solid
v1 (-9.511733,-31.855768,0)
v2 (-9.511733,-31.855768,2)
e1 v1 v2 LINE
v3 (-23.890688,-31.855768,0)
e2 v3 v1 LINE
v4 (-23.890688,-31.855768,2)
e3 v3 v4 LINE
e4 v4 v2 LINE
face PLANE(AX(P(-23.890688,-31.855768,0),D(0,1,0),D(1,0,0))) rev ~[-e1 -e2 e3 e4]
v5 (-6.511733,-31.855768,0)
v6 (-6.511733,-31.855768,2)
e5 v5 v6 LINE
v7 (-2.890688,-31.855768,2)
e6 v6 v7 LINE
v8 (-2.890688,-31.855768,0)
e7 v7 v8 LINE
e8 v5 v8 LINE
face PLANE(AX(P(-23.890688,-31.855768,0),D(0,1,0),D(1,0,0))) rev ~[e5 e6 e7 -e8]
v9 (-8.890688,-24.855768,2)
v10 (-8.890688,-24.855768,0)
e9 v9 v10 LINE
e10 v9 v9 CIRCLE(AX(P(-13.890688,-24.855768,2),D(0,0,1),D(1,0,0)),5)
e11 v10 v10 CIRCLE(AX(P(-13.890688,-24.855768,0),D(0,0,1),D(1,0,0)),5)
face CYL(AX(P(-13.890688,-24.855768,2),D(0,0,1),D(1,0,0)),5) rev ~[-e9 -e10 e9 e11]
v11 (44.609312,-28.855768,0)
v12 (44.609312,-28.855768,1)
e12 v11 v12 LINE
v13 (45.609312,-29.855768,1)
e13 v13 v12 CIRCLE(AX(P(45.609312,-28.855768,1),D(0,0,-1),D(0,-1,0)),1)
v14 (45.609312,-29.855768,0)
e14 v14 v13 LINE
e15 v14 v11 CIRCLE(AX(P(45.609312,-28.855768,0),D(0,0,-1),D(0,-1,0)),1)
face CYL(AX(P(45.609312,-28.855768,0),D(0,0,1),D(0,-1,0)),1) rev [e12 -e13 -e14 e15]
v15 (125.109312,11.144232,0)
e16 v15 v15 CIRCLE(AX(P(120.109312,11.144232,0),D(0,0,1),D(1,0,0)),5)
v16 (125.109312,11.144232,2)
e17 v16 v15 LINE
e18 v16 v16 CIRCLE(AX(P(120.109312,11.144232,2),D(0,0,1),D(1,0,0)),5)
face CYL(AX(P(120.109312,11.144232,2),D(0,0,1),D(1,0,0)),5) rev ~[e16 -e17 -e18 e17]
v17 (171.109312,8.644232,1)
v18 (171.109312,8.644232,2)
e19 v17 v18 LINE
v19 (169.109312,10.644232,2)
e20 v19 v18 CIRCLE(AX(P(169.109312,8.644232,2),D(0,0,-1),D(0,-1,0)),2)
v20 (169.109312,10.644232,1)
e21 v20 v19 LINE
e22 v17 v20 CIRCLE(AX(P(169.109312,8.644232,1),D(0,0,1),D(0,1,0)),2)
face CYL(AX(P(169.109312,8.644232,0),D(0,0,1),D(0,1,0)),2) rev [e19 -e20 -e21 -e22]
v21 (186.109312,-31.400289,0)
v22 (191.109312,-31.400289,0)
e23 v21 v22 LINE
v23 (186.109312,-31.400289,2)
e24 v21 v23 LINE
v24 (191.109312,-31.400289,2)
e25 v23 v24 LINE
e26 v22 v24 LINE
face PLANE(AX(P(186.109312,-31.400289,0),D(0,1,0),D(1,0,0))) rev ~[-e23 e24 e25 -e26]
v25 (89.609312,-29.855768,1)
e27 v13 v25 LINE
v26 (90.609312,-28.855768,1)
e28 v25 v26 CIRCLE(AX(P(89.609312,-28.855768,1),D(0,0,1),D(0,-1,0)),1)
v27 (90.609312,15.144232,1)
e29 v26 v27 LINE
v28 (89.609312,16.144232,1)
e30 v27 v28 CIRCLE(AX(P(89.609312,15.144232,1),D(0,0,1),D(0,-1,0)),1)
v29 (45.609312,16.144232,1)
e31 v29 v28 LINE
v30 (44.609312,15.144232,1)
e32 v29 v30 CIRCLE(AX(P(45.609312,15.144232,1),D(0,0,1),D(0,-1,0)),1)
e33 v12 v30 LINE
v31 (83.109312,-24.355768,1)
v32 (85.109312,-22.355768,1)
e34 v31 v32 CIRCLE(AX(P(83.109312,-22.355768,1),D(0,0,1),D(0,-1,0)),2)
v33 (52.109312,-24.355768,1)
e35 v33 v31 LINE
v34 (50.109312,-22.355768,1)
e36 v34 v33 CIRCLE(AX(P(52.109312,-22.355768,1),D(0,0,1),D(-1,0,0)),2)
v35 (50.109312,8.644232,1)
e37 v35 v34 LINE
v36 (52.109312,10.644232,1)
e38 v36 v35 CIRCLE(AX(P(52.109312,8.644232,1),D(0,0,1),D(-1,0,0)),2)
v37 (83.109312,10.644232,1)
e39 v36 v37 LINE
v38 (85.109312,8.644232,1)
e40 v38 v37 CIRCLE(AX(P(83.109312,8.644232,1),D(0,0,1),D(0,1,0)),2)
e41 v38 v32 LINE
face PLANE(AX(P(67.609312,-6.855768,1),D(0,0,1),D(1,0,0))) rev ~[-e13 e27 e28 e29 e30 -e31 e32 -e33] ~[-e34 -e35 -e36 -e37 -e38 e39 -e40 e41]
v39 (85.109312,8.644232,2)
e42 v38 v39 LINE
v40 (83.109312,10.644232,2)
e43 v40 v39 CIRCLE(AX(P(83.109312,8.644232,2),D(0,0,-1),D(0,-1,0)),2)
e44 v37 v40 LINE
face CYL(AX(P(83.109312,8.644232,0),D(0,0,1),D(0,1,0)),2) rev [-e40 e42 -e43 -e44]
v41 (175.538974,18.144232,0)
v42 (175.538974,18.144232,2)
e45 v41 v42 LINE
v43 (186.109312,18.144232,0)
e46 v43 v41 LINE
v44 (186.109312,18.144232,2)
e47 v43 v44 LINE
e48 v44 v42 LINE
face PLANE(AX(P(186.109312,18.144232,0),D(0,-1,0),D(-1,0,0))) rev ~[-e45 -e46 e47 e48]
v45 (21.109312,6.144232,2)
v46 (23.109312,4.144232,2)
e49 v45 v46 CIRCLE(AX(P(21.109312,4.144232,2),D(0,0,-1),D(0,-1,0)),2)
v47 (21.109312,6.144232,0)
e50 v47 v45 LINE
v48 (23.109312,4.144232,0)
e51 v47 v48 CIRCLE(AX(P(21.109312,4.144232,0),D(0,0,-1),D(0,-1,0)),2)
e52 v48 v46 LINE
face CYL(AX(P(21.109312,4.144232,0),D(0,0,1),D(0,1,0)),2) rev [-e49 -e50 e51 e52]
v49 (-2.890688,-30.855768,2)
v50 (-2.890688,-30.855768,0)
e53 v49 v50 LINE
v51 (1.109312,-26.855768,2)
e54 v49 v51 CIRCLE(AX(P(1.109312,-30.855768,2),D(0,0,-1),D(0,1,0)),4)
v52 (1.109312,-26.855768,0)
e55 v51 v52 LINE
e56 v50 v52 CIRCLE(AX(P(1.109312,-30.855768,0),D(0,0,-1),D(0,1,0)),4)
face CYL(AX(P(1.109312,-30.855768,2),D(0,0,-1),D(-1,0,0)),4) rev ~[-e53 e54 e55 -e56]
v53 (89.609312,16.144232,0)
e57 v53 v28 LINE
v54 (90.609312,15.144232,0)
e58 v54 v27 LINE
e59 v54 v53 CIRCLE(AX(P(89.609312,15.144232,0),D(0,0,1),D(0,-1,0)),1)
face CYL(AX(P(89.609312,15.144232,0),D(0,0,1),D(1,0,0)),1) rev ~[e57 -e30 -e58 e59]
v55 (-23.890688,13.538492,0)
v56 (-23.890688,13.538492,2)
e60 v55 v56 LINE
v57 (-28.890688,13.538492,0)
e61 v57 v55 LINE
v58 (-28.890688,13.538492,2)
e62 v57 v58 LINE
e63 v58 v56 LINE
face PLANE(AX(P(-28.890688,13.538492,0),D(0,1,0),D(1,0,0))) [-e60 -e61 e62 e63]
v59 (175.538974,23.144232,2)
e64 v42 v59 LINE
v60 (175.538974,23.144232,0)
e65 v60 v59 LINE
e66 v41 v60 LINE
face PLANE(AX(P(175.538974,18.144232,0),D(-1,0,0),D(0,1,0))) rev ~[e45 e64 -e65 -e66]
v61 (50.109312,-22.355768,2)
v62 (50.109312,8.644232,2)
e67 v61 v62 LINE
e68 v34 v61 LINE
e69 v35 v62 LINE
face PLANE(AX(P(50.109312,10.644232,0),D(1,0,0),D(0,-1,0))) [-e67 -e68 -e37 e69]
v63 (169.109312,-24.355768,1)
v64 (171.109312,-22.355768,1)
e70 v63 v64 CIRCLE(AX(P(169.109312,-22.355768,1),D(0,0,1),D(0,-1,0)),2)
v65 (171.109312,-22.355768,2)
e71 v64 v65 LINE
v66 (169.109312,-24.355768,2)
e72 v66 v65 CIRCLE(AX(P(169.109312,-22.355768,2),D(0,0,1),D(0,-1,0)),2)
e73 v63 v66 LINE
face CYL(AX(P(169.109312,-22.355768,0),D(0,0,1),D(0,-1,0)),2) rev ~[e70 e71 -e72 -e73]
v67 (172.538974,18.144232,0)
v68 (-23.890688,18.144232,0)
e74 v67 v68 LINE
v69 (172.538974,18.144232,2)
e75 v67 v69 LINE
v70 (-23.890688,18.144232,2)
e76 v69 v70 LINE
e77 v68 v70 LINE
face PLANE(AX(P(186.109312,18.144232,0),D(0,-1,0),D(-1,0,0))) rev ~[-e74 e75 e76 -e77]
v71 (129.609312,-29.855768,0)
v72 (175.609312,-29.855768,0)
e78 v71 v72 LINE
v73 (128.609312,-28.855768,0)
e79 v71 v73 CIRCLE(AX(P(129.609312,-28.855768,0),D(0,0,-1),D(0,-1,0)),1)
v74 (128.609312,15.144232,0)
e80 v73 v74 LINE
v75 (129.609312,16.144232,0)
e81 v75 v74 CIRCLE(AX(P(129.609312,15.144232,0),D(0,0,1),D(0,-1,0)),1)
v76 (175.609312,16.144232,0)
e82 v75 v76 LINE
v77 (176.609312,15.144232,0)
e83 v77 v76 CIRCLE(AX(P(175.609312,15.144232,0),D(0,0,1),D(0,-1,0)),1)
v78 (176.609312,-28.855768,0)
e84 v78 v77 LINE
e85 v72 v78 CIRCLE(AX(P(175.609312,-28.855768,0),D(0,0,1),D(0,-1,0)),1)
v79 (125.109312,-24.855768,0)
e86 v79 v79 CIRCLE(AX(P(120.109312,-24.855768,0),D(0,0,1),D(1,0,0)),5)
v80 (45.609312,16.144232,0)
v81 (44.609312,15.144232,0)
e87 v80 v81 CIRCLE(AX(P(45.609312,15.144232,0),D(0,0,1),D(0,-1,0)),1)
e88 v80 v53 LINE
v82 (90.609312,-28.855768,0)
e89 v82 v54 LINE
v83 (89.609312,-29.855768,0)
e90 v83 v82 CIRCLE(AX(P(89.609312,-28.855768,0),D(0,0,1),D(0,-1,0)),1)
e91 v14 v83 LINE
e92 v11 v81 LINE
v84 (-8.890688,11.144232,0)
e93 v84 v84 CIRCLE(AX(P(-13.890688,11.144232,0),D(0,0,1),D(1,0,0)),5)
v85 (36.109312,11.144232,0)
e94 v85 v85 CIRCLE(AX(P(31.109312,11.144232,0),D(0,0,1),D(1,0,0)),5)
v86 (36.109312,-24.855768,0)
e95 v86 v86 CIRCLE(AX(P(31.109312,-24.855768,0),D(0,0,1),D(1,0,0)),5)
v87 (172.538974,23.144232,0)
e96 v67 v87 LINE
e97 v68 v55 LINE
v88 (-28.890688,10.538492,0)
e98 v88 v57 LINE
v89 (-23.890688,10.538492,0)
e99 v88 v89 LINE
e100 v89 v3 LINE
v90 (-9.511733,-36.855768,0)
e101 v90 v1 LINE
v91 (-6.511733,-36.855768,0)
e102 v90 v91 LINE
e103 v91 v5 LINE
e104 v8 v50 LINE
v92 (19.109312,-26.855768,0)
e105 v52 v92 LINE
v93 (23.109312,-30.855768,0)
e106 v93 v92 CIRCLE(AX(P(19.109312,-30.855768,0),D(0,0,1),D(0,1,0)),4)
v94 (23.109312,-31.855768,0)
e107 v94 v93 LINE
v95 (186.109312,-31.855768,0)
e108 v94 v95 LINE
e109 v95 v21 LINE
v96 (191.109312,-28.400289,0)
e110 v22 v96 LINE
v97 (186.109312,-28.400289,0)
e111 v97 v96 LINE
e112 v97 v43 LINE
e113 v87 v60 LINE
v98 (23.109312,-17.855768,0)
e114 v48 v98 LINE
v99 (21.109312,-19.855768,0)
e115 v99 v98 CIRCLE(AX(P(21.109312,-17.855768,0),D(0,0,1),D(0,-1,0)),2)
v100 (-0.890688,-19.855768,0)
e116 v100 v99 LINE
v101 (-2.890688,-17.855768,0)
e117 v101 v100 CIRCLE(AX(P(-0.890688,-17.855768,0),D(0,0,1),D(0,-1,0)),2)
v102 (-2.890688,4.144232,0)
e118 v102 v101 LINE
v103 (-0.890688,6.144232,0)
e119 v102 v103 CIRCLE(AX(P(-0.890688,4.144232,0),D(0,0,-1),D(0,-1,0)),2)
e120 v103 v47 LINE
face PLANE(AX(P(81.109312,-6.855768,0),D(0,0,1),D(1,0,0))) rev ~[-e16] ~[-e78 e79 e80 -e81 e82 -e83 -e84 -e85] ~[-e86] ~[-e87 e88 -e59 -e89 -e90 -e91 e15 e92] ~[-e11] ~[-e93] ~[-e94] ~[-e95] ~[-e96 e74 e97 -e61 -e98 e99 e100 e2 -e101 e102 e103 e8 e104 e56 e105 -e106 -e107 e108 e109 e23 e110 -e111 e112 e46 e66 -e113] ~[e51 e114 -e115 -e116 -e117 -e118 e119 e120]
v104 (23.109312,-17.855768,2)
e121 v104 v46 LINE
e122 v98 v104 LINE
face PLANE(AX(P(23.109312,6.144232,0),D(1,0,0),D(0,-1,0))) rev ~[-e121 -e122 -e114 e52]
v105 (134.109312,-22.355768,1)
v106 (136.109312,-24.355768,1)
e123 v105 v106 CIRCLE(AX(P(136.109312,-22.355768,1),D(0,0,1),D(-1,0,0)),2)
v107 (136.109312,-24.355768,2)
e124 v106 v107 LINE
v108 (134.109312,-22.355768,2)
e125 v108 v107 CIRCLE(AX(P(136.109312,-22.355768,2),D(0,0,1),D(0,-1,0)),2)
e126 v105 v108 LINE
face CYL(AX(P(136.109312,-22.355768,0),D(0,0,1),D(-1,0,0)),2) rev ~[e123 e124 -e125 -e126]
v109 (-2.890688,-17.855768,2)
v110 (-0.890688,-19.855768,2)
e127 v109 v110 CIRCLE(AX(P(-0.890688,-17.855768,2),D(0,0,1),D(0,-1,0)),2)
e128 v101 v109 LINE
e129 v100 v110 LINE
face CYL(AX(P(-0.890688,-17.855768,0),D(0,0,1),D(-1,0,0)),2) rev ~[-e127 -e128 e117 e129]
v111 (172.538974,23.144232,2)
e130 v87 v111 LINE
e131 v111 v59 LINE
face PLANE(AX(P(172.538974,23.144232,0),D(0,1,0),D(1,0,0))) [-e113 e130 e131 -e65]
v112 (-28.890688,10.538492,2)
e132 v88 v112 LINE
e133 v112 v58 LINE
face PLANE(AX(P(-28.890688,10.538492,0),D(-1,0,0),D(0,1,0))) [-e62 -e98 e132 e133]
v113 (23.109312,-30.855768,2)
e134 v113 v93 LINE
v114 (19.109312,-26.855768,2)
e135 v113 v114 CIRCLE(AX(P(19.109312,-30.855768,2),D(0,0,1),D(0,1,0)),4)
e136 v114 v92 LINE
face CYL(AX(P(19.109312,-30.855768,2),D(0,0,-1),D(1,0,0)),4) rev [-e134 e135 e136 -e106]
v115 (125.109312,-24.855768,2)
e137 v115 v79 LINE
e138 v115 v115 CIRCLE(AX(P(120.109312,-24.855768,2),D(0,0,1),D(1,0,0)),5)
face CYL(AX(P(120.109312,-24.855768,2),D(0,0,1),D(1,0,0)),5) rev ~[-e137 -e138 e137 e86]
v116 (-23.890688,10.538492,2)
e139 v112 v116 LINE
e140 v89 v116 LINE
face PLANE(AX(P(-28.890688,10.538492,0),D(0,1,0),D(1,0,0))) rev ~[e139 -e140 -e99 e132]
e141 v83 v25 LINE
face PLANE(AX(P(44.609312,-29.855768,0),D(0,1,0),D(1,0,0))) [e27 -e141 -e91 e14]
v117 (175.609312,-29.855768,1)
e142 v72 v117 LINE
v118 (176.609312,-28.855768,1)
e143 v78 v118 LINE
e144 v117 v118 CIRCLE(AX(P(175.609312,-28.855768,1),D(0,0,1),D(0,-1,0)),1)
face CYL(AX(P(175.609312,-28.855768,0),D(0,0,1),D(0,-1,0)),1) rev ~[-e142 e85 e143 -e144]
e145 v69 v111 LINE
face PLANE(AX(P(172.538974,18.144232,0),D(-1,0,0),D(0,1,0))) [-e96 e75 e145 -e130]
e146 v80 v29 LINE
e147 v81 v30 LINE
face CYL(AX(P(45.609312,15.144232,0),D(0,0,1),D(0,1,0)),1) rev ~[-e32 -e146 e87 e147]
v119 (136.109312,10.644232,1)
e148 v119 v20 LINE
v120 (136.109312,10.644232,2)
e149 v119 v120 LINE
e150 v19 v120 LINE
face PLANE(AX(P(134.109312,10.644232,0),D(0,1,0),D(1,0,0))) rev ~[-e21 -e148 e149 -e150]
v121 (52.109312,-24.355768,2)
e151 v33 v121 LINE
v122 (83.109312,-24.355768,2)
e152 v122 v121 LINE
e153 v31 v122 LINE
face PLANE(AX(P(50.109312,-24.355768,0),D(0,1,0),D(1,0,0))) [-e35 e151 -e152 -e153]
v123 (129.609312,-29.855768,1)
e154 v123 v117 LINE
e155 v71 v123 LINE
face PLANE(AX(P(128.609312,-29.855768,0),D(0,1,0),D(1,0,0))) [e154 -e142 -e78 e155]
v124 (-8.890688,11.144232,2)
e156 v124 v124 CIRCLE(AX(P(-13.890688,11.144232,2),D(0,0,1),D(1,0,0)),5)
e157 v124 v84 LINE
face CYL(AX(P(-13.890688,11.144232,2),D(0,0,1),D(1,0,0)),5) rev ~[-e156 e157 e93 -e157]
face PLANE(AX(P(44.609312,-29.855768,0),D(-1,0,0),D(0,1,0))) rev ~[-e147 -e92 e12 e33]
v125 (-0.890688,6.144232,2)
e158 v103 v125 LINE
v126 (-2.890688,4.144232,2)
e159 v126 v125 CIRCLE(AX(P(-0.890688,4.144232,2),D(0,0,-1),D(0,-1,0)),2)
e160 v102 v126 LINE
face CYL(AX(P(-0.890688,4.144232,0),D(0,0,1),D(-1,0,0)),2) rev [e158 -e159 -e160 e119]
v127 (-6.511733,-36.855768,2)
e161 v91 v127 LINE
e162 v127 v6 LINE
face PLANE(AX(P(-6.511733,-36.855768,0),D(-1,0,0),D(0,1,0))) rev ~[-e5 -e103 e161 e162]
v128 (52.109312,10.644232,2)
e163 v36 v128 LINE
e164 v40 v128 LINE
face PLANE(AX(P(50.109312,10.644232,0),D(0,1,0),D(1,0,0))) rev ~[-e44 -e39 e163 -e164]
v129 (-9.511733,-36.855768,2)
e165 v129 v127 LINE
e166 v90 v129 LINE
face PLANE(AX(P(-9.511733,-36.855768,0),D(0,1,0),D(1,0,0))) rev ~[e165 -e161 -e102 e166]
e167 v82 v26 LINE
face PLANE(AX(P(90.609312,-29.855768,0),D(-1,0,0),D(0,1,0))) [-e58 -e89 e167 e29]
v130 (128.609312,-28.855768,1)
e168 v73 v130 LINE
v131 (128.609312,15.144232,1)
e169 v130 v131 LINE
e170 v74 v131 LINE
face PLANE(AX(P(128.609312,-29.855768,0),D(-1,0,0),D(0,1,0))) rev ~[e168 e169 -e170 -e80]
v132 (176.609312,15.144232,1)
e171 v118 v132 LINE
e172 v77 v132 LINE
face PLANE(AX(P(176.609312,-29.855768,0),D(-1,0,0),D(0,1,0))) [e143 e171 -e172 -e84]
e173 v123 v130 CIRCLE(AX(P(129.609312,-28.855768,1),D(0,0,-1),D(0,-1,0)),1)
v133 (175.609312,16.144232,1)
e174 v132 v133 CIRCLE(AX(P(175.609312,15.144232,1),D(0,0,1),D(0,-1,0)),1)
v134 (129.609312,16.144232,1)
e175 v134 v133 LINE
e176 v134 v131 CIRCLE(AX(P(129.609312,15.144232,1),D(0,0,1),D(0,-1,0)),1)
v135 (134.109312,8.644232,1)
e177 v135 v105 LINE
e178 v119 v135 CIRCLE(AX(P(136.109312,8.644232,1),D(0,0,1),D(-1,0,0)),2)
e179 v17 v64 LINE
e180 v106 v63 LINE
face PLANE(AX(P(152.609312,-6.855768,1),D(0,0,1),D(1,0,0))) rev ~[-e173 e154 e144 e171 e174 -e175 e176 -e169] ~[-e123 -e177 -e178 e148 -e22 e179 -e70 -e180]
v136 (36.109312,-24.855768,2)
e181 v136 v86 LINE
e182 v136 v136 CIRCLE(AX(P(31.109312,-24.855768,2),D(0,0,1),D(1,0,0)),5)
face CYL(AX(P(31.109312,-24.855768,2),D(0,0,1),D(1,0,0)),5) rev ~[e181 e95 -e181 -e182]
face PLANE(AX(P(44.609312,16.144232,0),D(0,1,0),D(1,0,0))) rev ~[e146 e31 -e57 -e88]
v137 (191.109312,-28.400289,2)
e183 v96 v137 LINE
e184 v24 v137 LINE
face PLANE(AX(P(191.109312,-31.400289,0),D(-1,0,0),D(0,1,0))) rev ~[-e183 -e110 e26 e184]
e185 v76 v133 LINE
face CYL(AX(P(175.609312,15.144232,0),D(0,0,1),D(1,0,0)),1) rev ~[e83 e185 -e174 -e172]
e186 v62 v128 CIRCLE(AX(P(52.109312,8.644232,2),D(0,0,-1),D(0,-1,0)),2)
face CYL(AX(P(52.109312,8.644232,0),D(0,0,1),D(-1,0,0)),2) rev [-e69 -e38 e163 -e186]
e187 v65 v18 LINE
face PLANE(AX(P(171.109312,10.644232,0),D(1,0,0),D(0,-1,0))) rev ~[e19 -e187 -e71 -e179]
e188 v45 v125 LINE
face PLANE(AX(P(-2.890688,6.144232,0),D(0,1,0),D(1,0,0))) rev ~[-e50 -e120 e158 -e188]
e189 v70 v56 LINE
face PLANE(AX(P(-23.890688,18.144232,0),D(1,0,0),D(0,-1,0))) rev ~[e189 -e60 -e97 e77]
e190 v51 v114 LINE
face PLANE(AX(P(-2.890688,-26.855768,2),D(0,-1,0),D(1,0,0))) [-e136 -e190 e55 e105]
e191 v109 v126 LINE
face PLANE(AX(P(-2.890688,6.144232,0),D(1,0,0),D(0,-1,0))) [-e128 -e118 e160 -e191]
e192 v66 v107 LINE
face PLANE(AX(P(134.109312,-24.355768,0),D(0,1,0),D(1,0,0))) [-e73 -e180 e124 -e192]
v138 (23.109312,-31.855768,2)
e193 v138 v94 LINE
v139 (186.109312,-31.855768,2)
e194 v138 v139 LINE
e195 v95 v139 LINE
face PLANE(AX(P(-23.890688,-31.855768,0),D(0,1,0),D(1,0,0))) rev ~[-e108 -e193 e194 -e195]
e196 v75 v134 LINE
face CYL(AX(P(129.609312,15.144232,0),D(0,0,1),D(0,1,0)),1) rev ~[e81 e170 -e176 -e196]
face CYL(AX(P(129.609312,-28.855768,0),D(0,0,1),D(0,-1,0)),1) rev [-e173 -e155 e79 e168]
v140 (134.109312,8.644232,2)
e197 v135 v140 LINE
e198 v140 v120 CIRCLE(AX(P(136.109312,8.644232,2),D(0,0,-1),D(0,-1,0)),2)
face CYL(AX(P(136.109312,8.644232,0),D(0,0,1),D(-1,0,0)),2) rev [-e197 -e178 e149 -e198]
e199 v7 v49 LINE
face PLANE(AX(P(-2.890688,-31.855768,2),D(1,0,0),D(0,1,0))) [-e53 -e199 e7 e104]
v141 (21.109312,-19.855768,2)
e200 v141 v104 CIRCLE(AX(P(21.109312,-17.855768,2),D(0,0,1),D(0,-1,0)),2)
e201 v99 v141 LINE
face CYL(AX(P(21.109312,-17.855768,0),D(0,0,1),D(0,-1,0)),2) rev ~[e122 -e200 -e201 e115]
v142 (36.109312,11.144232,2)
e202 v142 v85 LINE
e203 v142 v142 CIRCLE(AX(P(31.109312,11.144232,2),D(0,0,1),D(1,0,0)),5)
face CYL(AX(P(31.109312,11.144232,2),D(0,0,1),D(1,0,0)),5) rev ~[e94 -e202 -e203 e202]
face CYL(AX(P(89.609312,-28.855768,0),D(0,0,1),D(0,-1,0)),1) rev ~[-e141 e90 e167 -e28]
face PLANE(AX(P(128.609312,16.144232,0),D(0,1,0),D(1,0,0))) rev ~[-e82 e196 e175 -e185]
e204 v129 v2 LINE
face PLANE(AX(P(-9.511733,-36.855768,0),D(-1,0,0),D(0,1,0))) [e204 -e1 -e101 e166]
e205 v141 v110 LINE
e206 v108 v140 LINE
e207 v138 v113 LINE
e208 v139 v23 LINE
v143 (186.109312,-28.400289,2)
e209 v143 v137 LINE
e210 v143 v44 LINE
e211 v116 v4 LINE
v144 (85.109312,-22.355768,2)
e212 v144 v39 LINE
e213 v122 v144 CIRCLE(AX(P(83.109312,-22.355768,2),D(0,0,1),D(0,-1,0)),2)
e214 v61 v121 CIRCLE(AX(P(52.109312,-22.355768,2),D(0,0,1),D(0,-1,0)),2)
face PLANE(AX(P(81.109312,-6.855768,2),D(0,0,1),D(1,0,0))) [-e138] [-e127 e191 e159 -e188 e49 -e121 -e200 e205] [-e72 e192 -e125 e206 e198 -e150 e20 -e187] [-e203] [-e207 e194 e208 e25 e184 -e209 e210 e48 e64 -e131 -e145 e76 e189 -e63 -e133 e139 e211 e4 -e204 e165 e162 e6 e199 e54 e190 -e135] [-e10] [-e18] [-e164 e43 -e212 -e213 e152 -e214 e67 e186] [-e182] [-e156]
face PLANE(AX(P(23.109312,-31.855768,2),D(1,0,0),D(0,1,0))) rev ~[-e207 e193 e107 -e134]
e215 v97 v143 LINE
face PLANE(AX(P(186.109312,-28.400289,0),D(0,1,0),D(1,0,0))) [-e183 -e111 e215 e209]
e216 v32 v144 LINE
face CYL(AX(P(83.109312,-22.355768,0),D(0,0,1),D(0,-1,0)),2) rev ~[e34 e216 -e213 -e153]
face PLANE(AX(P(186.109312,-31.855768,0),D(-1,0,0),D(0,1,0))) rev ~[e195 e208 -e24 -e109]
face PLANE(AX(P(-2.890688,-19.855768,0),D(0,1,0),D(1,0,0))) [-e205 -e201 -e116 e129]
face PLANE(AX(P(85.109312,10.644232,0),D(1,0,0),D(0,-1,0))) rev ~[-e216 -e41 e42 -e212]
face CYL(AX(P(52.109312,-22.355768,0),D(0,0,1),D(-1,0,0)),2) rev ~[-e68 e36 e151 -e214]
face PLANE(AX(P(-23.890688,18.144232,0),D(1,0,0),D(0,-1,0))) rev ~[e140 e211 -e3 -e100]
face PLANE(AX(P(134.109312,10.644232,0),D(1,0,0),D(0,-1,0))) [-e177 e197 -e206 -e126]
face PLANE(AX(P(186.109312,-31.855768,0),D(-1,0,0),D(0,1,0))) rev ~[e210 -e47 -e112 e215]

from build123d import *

# Parameters (mm, degrees)
F1_DEPTH  = 2
F2_W      = 26
F2_H      = 26
F3_DEPTH  = 15.4
F4_W      = 35
F4_H      = 35
F4_W_2    = 37
F5_DEPTH  = 25
F6_W      = 26
F6_H      = 5
F7_DEPTH  = 25
F8_R      = 4
F9_R      = 2
F10_R     = 5
F11_DEPTH = 25
F12_R     = 5
F13_DEPTH = 25
F14_W     = 46
F14_H     = 46
F14_W_2   = 48
F15_DEPTH = 1
F16_R     = 1
F17_R     = 1
F0_W      = 5
F0_H      = 3
F0_W_2    = 3
F0_H_2    = 5
F18_DEPTH = 2


# Not quite as in the source:
# - a feature names something its author has since deleted; it is built from what else it names


with BuildPart() as f1:
    # F0 (on Top) → F1 (new body)
    with BuildSketch(Plane.XY):
        Polygon((172.5389735401, 18.1442317292), (-23.8906879723, 18.1442317292), (-23.8906879723, 13.5384923518), (-23.8906879723, 10.5384923518), (-23.8906879723, -31.8557682708), (-9.5117332786, -31.8557682708), (-6.5117332786, -31.8557682708), (186.1093120277, -31.8557682708), (186.1093120277, -31.4002893865), (186.1093120277, -28.4002893865), (186.1093120277, 18.1442317292), (175.5389735401, 18.1442317292), align=None)
    extrude(amount=F1_DEPTH)

    # F2 (on face) → F3 (cut)
    with BuildSketch(Plane(origin=(0, 0, 0), x_dir=(1, 0, 0), z_dir=(0, 0, -1))):
        with Locations((10.1093120277, 6.8557682708)):
            Rectangle(F2_W, F2_H)
    extrude(amount=-F3_DEPTH, mode=Mode.SUBTRACT)

    # F4 (on face) → F5 (cut)
    with BuildSketch(Plane(origin=(0, 0, 0), x_dir=(1, 0, 0), z_dir=(0, 0, -1))):
        with Locations((67.6093120277, 6.8557682708)):
            Rectangle(F4_W, F4_H)
        with Locations((152.6093120277, 6.8557682708)):
            Rectangle(F4_W_2, F4_H)
    extrude(amount=-F5_DEPTH, mode=Mode.SUBTRACT)

    # F6 (on face) → F7 (cut)
    with BuildSketch(Plane.XY.offset(2)):
        with Locations((10.1093120277, -29.3557682708)):
            Rectangle(F6_W, F6_H)
    extrude(amount=-F7_DEPTH, mode=Mode.SUBTRACT)

    # F8
    f8_edges = [f1.edges().sort_by_distance(p)[0] for p in [
        (-2.890688, -26.855768, 1),
        (23.109312, -26.855768, 1),
    ]]
    fillet(f8_edges, radius=F8_R)

    # F9
    f9_edges = [f1.edges().sort_by_distance(p)[0] for p in [
        (50.109312, 10.644232, 1),
        (85.109312, 10.644232, 1),
        (50.109312, -24.355768, 1),
        (134.109312, -24.355768, 1),
        (85.109312, -24.355768, 1),
        (171.109312, -24.355768, 1),
        (134.109312, 10.644232, 1),
        (171.109312, 10.644232, 1),
        (23.109312, 6.144232, 1),
        (-2.890688, 6.144232, 1),
        (23.109312, -19.855768, 1),
        (-2.890688, -19.855768, 1),
    ]]
    fillet(f9_edges, radius=F9_R)

    # F10 (on face) → F11 (cut)
    with BuildSketch(Plane.XY.offset(2)):
        with Locations((120.1093120277, 11.1442317292)):
            Circle(F10_R)
        with Locations((120.1093120277, -24.8557682708)):
            Circle(F10_R)
        with Locations((31.1093120277, -24.8557682708)):
            Circle(F10_R)
        with Locations((-13.8906879723, 11.1442317292)):
            Circle(F10_R)
        with Locations((-13.8906879723, -24.8557682708)):
            Circle(F10_R)
    extrude(amount=-F11_DEPTH, mode=Mode.SUBTRACT)

    # F12 (on face) → F13 (cut)
    with BuildSketch(Plane.XY.offset(2)):
        with Locations((31.1093120277, 11.1442317292)):
            Circle(F12_R)
    extrude(amount=-F13_DEPTH, mode=Mode.SUBTRACT)

    # F14 (on face) → F15 (cut)
    with BuildSketch(Plane.XY):
        with Locations((67.6093120277, -6.8557682708)):
            Rectangle(F14_W, F14_H)
        with Locations((152.6093120277, -6.8557682708)):
            Rectangle(F14_W_2, F14_H)
    extrude(amount=F15_DEPTH, mode=Mode.SUBTRACT)

    # F16
    f16_edges = [f1.edges().sort_by_distance(p)[0] for p in [
        (44.609312, -29.855768, 0.5),
        (90.609312, -29.855768, 0.5),
        (90.609312, 16.144232, 0.5),
        (44.609312, 16.144232, 0.5),
    ]]
    fillet(f16_edges, radius=F16_R)

    # F17
    f17_edges = [f1.edges().sort_by_distance(p)[0] for p in [
        (128.609312, -29.855768, 0.5),
        (176.609312, -29.855768, 0.5),
        (176.609312, 16.144232, 0.5),
        (128.609312, 16.144232, 0.5),
    ]]
    fillet(f17_edges, radius=F17_R)

    # F0 (on Top) → F18 (join)
    with BuildSketch(Plane.XY):
        with Locations((188.6093120277, -29.9002893865)):
            Rectangle(F0_W, F0_H)
        with Locations((174.0389735401, 20.6442317292)):
            Rectangle(F0_W_2, F0_H_2)
        with Locations((-8.0117332786, -34.3557682708)):
            Rectangle(F0_W_2, F0_H_2)
        with Locations((-26.3906879723, 12.0384923518)):
            Rectangle(F0_W, F0_H)
    extrude(amount=F18_DEPTH)


solid = f1.part
